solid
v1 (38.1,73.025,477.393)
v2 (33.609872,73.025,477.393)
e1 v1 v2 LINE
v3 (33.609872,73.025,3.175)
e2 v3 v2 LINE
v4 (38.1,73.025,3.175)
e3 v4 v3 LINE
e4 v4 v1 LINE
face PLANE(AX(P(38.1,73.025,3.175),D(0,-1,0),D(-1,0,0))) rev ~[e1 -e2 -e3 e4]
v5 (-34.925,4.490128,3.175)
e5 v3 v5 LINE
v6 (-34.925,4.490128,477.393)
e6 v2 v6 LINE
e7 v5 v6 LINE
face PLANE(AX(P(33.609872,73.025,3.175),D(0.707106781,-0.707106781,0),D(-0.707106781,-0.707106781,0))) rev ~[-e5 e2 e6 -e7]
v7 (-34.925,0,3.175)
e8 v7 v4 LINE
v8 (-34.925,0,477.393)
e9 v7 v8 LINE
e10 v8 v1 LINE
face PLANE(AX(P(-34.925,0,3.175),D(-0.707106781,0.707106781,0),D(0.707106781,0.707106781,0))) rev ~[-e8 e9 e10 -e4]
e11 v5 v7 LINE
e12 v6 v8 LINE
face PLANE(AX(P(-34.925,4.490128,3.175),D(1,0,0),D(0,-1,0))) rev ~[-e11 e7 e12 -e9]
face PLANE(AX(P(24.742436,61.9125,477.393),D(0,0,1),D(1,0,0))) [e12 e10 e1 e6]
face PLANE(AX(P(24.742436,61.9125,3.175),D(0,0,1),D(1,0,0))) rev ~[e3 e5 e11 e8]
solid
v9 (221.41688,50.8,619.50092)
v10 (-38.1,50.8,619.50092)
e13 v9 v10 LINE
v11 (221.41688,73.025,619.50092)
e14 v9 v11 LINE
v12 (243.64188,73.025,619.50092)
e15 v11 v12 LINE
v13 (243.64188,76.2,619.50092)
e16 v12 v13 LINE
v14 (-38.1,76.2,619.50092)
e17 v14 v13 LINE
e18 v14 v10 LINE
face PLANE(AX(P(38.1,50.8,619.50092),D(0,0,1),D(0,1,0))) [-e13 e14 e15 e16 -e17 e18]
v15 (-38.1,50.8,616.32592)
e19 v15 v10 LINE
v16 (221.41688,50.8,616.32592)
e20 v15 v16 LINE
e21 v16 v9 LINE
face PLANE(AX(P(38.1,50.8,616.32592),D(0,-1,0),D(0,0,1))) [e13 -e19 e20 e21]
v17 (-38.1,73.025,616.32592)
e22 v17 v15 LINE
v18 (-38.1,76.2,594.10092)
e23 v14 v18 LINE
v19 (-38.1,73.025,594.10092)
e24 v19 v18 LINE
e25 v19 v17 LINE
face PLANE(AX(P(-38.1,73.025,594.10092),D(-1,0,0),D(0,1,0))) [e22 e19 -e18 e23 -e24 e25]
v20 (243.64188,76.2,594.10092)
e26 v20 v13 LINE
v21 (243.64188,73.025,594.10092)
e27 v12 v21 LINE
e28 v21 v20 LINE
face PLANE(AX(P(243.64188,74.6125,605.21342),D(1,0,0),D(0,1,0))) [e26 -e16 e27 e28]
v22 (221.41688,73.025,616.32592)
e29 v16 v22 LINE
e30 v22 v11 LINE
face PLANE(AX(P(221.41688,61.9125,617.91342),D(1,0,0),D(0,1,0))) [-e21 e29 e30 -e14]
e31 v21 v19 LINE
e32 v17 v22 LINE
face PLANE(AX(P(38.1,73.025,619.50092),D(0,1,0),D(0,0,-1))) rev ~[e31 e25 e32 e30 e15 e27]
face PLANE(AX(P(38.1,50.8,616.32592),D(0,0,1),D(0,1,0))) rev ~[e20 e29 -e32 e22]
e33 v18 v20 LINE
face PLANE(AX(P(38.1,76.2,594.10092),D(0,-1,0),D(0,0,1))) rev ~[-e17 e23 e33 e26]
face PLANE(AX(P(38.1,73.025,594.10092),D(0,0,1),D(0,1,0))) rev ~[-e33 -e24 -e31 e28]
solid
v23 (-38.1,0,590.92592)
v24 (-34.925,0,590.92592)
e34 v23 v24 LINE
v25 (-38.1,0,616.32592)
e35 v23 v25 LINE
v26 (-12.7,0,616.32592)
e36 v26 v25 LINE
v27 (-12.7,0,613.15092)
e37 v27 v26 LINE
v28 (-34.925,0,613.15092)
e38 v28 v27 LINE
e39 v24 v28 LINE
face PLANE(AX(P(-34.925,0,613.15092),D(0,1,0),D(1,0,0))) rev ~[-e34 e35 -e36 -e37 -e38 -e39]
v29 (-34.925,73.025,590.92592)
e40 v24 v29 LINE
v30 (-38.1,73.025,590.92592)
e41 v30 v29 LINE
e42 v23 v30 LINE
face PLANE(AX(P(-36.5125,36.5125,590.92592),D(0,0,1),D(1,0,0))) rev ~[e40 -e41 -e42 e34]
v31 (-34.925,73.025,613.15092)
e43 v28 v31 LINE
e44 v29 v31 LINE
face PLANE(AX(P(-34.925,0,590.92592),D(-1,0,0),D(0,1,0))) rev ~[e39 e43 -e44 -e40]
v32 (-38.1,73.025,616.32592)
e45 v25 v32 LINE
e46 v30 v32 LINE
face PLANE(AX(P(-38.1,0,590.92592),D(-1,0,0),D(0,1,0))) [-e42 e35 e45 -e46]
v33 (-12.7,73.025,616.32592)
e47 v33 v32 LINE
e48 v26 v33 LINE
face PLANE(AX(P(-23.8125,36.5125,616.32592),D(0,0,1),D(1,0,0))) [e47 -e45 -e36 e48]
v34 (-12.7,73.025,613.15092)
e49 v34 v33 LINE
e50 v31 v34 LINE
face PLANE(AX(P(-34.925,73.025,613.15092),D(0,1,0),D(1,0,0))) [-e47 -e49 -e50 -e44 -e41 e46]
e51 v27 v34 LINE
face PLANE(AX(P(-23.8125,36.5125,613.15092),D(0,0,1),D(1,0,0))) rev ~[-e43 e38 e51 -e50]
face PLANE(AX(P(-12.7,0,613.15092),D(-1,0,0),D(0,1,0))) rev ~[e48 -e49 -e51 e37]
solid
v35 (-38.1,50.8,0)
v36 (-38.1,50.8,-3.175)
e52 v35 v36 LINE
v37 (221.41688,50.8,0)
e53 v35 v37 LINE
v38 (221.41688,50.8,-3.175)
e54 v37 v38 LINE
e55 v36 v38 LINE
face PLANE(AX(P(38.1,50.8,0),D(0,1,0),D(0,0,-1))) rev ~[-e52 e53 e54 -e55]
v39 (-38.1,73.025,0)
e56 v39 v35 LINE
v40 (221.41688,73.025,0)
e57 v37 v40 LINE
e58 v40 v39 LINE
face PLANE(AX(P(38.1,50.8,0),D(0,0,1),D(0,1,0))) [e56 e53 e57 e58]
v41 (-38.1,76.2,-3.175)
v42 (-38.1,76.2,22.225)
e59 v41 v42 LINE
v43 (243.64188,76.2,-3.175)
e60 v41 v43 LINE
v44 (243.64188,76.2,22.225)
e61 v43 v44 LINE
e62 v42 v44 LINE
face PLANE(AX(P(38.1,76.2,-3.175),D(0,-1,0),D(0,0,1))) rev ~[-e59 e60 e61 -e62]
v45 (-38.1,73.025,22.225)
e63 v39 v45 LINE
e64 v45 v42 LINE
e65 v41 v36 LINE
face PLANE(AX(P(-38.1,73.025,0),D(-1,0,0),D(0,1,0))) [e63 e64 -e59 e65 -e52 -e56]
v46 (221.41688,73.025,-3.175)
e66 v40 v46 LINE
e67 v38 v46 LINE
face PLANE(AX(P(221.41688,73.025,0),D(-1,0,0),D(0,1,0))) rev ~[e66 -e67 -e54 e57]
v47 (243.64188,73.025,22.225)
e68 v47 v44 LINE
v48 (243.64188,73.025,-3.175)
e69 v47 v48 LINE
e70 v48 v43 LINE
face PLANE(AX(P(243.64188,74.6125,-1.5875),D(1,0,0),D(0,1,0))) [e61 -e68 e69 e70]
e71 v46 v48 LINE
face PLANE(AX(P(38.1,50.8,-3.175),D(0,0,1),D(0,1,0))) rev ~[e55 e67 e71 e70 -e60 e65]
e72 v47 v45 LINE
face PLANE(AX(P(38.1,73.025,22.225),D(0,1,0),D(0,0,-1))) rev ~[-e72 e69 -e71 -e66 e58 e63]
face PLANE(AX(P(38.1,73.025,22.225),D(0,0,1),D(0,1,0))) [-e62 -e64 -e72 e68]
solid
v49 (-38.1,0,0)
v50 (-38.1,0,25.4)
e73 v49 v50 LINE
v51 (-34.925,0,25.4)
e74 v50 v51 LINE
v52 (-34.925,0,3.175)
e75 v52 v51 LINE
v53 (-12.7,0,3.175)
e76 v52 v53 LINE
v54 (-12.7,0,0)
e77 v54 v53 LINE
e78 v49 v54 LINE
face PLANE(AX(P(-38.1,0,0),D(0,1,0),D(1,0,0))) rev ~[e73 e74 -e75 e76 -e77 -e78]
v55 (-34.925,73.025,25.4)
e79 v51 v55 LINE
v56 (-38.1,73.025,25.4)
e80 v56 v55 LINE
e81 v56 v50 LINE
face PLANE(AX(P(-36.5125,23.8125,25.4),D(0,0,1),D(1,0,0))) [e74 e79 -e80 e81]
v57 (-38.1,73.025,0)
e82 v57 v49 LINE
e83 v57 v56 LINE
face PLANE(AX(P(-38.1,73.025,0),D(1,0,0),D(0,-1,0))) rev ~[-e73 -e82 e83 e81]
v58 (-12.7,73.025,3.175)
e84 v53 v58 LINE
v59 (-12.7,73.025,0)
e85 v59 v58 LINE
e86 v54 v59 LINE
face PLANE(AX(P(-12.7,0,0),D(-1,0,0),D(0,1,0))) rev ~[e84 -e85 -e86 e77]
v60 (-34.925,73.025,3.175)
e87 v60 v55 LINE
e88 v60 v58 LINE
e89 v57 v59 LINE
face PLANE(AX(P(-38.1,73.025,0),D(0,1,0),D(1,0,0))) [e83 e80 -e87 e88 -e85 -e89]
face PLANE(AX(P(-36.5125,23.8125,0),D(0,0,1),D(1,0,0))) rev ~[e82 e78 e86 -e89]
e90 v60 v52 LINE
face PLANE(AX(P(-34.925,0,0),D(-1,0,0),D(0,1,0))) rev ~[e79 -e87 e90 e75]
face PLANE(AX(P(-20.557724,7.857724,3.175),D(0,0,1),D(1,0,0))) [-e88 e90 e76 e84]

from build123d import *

# Parameters (mm, degrees)
F0_W      = 22.225
F0_H      = 22.225
F0_W_2    = 3.175
F0_H_2    = 3.175
F1_DEPTH  = 3.175
F2_START  = 3.175
F2_DEPTH  = 474.218
F3_DEPTH  = 22.225
F4_START  = -619.50092
F1_FACE_W = 76.2
F1_FACE_H = 25.4
F4_DEPTH  = 3.175
F5_START  = 571.87592
F3_FACE_W = 76.2
F3_FACE_H = 3.175
F5_DEPTH  = 22.225
F6_DEPTH  = 3.175
F7_DEPTH  = 25.4
F8_START  = 565.52592
F7_FACE_W = 3.175
F7_FACE_H = 73.025
F8_DEPTH  = 25.4
F9_START  = 609.97592
F6_FACE_W = 22.225
F6_FACE_H = 73.025
F9_DEPTH  = 3.175
F10_W     = 3.175
F10_H     = 3.175
F10_H_2   = 22.225
F11_DEPTH = 205.54188
F12_DEPTH = 183.31688
F13_DEPTH = 205.54188
F10_W_2   = 22.225
F14_DEPTH = 183.31688


with BuildPart() as f1:
    # F0 (on Top) → F1 (new body)
    with BuildSketch(Plane.XY):
        Polygon((38.1, 50.8), (38.1, 73.025), (15.875, 50.8), align=None)
        Polygon((15.875, 50.8), (38.1, 73.025), (33.6098719395, 73.025), (11.3848719395, 50.8), align=None)
        Polygon((33.6098719395, 73.025), (-12.7, 73.025), (-12.7, 50.8), (11.3848719395, 50.8), align=None)
        with Locations((-23.8125, 61.9125)):
            Rectangle(F0_W, F0_H)
        with Locations((-36.5125, 61.9125)):
            Rectangle(F0_W_2, F0_H)
        Polygon((38.1, 76.2), (-34.925, 76.2), (-34.925, 73.025), (-12.7, 73.025), (33.6098719395, 73.025), (38.1, 73.025), align=None)
        with Locations((-36.5125, 74.6125)):
            Rectangle(F0_W_2, F0_H_2)
    extrude(amount=-F1_DEPTH)

    # F0 (on Top) → F3 (join)
    with BuildSketch(Plane.XY):
        Polygon((38.1, 76.2), (-34.925, 76.2), (-34.925, 73.025), (-12.7, 73.025), (33.6098719395, 73.025), (38.1, 73.025), align=None)
        with Locations((-36.5125, 74.6125)):
            Rectangle(F0_W_2, F0_H_2)
    extrude(amount=F3_DEPTH)

    # F10 (on face) → F11 (join)
    with BuildSketch(Plane.YZ.offset(38.1)):
        with Locations((74.6125, -1.5875)):
            Rectangle(F10_W, F10_H)
        with Locations((74.6125, 11.1125)):
            Rectangle(F10_W, F10_H_2)
    extrude(amount=F11_DEPTH)

    # F12 (add): a face of the model
    f12_faces = [f1.faces().sort_by_distance(p)[0] for p in [
        (38.1, 61.9125, -1.5875),
    ]]
    extrude(f12_faces, amount=F12_DEPTH)


with BuildPart() as f2:
    # F0 (on Top) → F2 (new body)
    with BuildSketch(Plane.XY.offset(F2_START)):
        Polygon((15.875, 50.8), (38.1, 73.025), (33.6098719395, 73.025), (11.3848719395, 50.8), align=None)
        Polygon((-12.7, 22.225), (15.875, 50.8), (11.3848719395, 50.8), (-12.7, 26.7151280605), align=None)
        Polygon((-12.7, 26.7151280605), (-34.925, 4.4901280605), (-34.925, 0), (-12.7, 22.225), align=None)
    extrude(amount=F2_DEPTH)


with BuildPart() as f4:
    # F1_face (on face) → F4 (new body)
    with BuildSketch(Plane(origin=(0, 63.5, -3.175), x_dir=(1, 0, 0), z_dir=(0, 0, -1)).offset(F4_START)):
        Rectangle(F1_FACE_W, F1_FACE_H)
    extrude(amount=-F4_DEPTH)

    # F3_face (on face) → F5 (join)
    with BuildSketch(Plane(origin=(0, 74.6125, 22.225), x_dir=(1, 0, 0), z_dir=(0, 0, 1)).offset(F5_START)):
        Rectangle(F3_FACE_W, F3_FACE_H)
    extrude(amount=F5_DEPTH)

    # F10 (on face) → F13 (join)
    with BuildSketch(Plane.YZ.offset(38.1)):
        with Locations((74.6125, 605.21342)):
            Rectangle(F10_W, F10_H_2)
        with Locations((74.6125, 617.91342)):
            Rectangle(F10_W, F10_H)
    extrude(amount=F13_DEPTH)

    # F10 (on face) → F14 (join)
    with BuildSketch(Plane.YZ.offset(38.1)):
        with Locations((61.9125, 617.91342)):
            Rectangle(F10_W_2, F10_H)
    extrude(amount=F14_DEPTH)


with BuildPart() as f6:
    # F0 (on Top) → F6 (new body)
    with BuildSketch(Plane.XY):
        Polygon((-12.7, 0), (-12.7, 22.225), (-34.925, 0), align=None)
        Polygon((-12.7, 26.7151280605), (-34.925, 4.4901280605), (-34.925, 0), (-12.7, 22.225), align=None)
        Polygon((-12.7, 50.8), (-34.925, 50.8), (-34.925, 47.625), (-34.925, 4.4901280605), (-12.7, 26.7151280605), align=None)
        with Locations((-23.8125, 61.9125)):
            Rectangle(F0_W, F0_H)
    extrude(amount=F6_DEPTH)

    # F0 (on Top) → F7 (join)
    with BuildSketch(Plane.XY):
        Polygon((-34.925, 47.625), (-38.1, 47.625), (-38.1, 0), (-34.925, 0), (-34.925, 4.4901280605), align=None)
        with Locations((-36.5125, 61.9125)):
            Rectangle(F0_W_2, F0_H)
        with Locations((-36.5125, 49.2125)):
            Rectangle(F0_W_2, F0_H_2)
    extrude(amount=F7_DEPTH)


with BuildPart() as f8:
    # F7_face (on face) → F8 (new body)
    with BuildSketch(Plane(origin=(-36.5125, 36.5125, 25.4), x_dir=(1, 0, 0), z_dir=(0, 0, 1)).offset(F8_START)):
        Rectangle(F7_FACE_W, F7_FACE_H)
    extrude(amount=F8_DEPTH)

    # F6_face (on face) → F9 (join)
    with BuildSketch(Plane(origin=(-23.8125, 36.5125, 3.175), x_dir=(1, 0, 0), z_dir=(0, 0, 1)).offset(F9_START)):
        Rectangle(F6_FACE_W, F6_FACE_H)
    extrude(amount=F9_DEPTH)


solid = Compound([f1.part, f2.part, f4.part, f6.part, f8.part])
